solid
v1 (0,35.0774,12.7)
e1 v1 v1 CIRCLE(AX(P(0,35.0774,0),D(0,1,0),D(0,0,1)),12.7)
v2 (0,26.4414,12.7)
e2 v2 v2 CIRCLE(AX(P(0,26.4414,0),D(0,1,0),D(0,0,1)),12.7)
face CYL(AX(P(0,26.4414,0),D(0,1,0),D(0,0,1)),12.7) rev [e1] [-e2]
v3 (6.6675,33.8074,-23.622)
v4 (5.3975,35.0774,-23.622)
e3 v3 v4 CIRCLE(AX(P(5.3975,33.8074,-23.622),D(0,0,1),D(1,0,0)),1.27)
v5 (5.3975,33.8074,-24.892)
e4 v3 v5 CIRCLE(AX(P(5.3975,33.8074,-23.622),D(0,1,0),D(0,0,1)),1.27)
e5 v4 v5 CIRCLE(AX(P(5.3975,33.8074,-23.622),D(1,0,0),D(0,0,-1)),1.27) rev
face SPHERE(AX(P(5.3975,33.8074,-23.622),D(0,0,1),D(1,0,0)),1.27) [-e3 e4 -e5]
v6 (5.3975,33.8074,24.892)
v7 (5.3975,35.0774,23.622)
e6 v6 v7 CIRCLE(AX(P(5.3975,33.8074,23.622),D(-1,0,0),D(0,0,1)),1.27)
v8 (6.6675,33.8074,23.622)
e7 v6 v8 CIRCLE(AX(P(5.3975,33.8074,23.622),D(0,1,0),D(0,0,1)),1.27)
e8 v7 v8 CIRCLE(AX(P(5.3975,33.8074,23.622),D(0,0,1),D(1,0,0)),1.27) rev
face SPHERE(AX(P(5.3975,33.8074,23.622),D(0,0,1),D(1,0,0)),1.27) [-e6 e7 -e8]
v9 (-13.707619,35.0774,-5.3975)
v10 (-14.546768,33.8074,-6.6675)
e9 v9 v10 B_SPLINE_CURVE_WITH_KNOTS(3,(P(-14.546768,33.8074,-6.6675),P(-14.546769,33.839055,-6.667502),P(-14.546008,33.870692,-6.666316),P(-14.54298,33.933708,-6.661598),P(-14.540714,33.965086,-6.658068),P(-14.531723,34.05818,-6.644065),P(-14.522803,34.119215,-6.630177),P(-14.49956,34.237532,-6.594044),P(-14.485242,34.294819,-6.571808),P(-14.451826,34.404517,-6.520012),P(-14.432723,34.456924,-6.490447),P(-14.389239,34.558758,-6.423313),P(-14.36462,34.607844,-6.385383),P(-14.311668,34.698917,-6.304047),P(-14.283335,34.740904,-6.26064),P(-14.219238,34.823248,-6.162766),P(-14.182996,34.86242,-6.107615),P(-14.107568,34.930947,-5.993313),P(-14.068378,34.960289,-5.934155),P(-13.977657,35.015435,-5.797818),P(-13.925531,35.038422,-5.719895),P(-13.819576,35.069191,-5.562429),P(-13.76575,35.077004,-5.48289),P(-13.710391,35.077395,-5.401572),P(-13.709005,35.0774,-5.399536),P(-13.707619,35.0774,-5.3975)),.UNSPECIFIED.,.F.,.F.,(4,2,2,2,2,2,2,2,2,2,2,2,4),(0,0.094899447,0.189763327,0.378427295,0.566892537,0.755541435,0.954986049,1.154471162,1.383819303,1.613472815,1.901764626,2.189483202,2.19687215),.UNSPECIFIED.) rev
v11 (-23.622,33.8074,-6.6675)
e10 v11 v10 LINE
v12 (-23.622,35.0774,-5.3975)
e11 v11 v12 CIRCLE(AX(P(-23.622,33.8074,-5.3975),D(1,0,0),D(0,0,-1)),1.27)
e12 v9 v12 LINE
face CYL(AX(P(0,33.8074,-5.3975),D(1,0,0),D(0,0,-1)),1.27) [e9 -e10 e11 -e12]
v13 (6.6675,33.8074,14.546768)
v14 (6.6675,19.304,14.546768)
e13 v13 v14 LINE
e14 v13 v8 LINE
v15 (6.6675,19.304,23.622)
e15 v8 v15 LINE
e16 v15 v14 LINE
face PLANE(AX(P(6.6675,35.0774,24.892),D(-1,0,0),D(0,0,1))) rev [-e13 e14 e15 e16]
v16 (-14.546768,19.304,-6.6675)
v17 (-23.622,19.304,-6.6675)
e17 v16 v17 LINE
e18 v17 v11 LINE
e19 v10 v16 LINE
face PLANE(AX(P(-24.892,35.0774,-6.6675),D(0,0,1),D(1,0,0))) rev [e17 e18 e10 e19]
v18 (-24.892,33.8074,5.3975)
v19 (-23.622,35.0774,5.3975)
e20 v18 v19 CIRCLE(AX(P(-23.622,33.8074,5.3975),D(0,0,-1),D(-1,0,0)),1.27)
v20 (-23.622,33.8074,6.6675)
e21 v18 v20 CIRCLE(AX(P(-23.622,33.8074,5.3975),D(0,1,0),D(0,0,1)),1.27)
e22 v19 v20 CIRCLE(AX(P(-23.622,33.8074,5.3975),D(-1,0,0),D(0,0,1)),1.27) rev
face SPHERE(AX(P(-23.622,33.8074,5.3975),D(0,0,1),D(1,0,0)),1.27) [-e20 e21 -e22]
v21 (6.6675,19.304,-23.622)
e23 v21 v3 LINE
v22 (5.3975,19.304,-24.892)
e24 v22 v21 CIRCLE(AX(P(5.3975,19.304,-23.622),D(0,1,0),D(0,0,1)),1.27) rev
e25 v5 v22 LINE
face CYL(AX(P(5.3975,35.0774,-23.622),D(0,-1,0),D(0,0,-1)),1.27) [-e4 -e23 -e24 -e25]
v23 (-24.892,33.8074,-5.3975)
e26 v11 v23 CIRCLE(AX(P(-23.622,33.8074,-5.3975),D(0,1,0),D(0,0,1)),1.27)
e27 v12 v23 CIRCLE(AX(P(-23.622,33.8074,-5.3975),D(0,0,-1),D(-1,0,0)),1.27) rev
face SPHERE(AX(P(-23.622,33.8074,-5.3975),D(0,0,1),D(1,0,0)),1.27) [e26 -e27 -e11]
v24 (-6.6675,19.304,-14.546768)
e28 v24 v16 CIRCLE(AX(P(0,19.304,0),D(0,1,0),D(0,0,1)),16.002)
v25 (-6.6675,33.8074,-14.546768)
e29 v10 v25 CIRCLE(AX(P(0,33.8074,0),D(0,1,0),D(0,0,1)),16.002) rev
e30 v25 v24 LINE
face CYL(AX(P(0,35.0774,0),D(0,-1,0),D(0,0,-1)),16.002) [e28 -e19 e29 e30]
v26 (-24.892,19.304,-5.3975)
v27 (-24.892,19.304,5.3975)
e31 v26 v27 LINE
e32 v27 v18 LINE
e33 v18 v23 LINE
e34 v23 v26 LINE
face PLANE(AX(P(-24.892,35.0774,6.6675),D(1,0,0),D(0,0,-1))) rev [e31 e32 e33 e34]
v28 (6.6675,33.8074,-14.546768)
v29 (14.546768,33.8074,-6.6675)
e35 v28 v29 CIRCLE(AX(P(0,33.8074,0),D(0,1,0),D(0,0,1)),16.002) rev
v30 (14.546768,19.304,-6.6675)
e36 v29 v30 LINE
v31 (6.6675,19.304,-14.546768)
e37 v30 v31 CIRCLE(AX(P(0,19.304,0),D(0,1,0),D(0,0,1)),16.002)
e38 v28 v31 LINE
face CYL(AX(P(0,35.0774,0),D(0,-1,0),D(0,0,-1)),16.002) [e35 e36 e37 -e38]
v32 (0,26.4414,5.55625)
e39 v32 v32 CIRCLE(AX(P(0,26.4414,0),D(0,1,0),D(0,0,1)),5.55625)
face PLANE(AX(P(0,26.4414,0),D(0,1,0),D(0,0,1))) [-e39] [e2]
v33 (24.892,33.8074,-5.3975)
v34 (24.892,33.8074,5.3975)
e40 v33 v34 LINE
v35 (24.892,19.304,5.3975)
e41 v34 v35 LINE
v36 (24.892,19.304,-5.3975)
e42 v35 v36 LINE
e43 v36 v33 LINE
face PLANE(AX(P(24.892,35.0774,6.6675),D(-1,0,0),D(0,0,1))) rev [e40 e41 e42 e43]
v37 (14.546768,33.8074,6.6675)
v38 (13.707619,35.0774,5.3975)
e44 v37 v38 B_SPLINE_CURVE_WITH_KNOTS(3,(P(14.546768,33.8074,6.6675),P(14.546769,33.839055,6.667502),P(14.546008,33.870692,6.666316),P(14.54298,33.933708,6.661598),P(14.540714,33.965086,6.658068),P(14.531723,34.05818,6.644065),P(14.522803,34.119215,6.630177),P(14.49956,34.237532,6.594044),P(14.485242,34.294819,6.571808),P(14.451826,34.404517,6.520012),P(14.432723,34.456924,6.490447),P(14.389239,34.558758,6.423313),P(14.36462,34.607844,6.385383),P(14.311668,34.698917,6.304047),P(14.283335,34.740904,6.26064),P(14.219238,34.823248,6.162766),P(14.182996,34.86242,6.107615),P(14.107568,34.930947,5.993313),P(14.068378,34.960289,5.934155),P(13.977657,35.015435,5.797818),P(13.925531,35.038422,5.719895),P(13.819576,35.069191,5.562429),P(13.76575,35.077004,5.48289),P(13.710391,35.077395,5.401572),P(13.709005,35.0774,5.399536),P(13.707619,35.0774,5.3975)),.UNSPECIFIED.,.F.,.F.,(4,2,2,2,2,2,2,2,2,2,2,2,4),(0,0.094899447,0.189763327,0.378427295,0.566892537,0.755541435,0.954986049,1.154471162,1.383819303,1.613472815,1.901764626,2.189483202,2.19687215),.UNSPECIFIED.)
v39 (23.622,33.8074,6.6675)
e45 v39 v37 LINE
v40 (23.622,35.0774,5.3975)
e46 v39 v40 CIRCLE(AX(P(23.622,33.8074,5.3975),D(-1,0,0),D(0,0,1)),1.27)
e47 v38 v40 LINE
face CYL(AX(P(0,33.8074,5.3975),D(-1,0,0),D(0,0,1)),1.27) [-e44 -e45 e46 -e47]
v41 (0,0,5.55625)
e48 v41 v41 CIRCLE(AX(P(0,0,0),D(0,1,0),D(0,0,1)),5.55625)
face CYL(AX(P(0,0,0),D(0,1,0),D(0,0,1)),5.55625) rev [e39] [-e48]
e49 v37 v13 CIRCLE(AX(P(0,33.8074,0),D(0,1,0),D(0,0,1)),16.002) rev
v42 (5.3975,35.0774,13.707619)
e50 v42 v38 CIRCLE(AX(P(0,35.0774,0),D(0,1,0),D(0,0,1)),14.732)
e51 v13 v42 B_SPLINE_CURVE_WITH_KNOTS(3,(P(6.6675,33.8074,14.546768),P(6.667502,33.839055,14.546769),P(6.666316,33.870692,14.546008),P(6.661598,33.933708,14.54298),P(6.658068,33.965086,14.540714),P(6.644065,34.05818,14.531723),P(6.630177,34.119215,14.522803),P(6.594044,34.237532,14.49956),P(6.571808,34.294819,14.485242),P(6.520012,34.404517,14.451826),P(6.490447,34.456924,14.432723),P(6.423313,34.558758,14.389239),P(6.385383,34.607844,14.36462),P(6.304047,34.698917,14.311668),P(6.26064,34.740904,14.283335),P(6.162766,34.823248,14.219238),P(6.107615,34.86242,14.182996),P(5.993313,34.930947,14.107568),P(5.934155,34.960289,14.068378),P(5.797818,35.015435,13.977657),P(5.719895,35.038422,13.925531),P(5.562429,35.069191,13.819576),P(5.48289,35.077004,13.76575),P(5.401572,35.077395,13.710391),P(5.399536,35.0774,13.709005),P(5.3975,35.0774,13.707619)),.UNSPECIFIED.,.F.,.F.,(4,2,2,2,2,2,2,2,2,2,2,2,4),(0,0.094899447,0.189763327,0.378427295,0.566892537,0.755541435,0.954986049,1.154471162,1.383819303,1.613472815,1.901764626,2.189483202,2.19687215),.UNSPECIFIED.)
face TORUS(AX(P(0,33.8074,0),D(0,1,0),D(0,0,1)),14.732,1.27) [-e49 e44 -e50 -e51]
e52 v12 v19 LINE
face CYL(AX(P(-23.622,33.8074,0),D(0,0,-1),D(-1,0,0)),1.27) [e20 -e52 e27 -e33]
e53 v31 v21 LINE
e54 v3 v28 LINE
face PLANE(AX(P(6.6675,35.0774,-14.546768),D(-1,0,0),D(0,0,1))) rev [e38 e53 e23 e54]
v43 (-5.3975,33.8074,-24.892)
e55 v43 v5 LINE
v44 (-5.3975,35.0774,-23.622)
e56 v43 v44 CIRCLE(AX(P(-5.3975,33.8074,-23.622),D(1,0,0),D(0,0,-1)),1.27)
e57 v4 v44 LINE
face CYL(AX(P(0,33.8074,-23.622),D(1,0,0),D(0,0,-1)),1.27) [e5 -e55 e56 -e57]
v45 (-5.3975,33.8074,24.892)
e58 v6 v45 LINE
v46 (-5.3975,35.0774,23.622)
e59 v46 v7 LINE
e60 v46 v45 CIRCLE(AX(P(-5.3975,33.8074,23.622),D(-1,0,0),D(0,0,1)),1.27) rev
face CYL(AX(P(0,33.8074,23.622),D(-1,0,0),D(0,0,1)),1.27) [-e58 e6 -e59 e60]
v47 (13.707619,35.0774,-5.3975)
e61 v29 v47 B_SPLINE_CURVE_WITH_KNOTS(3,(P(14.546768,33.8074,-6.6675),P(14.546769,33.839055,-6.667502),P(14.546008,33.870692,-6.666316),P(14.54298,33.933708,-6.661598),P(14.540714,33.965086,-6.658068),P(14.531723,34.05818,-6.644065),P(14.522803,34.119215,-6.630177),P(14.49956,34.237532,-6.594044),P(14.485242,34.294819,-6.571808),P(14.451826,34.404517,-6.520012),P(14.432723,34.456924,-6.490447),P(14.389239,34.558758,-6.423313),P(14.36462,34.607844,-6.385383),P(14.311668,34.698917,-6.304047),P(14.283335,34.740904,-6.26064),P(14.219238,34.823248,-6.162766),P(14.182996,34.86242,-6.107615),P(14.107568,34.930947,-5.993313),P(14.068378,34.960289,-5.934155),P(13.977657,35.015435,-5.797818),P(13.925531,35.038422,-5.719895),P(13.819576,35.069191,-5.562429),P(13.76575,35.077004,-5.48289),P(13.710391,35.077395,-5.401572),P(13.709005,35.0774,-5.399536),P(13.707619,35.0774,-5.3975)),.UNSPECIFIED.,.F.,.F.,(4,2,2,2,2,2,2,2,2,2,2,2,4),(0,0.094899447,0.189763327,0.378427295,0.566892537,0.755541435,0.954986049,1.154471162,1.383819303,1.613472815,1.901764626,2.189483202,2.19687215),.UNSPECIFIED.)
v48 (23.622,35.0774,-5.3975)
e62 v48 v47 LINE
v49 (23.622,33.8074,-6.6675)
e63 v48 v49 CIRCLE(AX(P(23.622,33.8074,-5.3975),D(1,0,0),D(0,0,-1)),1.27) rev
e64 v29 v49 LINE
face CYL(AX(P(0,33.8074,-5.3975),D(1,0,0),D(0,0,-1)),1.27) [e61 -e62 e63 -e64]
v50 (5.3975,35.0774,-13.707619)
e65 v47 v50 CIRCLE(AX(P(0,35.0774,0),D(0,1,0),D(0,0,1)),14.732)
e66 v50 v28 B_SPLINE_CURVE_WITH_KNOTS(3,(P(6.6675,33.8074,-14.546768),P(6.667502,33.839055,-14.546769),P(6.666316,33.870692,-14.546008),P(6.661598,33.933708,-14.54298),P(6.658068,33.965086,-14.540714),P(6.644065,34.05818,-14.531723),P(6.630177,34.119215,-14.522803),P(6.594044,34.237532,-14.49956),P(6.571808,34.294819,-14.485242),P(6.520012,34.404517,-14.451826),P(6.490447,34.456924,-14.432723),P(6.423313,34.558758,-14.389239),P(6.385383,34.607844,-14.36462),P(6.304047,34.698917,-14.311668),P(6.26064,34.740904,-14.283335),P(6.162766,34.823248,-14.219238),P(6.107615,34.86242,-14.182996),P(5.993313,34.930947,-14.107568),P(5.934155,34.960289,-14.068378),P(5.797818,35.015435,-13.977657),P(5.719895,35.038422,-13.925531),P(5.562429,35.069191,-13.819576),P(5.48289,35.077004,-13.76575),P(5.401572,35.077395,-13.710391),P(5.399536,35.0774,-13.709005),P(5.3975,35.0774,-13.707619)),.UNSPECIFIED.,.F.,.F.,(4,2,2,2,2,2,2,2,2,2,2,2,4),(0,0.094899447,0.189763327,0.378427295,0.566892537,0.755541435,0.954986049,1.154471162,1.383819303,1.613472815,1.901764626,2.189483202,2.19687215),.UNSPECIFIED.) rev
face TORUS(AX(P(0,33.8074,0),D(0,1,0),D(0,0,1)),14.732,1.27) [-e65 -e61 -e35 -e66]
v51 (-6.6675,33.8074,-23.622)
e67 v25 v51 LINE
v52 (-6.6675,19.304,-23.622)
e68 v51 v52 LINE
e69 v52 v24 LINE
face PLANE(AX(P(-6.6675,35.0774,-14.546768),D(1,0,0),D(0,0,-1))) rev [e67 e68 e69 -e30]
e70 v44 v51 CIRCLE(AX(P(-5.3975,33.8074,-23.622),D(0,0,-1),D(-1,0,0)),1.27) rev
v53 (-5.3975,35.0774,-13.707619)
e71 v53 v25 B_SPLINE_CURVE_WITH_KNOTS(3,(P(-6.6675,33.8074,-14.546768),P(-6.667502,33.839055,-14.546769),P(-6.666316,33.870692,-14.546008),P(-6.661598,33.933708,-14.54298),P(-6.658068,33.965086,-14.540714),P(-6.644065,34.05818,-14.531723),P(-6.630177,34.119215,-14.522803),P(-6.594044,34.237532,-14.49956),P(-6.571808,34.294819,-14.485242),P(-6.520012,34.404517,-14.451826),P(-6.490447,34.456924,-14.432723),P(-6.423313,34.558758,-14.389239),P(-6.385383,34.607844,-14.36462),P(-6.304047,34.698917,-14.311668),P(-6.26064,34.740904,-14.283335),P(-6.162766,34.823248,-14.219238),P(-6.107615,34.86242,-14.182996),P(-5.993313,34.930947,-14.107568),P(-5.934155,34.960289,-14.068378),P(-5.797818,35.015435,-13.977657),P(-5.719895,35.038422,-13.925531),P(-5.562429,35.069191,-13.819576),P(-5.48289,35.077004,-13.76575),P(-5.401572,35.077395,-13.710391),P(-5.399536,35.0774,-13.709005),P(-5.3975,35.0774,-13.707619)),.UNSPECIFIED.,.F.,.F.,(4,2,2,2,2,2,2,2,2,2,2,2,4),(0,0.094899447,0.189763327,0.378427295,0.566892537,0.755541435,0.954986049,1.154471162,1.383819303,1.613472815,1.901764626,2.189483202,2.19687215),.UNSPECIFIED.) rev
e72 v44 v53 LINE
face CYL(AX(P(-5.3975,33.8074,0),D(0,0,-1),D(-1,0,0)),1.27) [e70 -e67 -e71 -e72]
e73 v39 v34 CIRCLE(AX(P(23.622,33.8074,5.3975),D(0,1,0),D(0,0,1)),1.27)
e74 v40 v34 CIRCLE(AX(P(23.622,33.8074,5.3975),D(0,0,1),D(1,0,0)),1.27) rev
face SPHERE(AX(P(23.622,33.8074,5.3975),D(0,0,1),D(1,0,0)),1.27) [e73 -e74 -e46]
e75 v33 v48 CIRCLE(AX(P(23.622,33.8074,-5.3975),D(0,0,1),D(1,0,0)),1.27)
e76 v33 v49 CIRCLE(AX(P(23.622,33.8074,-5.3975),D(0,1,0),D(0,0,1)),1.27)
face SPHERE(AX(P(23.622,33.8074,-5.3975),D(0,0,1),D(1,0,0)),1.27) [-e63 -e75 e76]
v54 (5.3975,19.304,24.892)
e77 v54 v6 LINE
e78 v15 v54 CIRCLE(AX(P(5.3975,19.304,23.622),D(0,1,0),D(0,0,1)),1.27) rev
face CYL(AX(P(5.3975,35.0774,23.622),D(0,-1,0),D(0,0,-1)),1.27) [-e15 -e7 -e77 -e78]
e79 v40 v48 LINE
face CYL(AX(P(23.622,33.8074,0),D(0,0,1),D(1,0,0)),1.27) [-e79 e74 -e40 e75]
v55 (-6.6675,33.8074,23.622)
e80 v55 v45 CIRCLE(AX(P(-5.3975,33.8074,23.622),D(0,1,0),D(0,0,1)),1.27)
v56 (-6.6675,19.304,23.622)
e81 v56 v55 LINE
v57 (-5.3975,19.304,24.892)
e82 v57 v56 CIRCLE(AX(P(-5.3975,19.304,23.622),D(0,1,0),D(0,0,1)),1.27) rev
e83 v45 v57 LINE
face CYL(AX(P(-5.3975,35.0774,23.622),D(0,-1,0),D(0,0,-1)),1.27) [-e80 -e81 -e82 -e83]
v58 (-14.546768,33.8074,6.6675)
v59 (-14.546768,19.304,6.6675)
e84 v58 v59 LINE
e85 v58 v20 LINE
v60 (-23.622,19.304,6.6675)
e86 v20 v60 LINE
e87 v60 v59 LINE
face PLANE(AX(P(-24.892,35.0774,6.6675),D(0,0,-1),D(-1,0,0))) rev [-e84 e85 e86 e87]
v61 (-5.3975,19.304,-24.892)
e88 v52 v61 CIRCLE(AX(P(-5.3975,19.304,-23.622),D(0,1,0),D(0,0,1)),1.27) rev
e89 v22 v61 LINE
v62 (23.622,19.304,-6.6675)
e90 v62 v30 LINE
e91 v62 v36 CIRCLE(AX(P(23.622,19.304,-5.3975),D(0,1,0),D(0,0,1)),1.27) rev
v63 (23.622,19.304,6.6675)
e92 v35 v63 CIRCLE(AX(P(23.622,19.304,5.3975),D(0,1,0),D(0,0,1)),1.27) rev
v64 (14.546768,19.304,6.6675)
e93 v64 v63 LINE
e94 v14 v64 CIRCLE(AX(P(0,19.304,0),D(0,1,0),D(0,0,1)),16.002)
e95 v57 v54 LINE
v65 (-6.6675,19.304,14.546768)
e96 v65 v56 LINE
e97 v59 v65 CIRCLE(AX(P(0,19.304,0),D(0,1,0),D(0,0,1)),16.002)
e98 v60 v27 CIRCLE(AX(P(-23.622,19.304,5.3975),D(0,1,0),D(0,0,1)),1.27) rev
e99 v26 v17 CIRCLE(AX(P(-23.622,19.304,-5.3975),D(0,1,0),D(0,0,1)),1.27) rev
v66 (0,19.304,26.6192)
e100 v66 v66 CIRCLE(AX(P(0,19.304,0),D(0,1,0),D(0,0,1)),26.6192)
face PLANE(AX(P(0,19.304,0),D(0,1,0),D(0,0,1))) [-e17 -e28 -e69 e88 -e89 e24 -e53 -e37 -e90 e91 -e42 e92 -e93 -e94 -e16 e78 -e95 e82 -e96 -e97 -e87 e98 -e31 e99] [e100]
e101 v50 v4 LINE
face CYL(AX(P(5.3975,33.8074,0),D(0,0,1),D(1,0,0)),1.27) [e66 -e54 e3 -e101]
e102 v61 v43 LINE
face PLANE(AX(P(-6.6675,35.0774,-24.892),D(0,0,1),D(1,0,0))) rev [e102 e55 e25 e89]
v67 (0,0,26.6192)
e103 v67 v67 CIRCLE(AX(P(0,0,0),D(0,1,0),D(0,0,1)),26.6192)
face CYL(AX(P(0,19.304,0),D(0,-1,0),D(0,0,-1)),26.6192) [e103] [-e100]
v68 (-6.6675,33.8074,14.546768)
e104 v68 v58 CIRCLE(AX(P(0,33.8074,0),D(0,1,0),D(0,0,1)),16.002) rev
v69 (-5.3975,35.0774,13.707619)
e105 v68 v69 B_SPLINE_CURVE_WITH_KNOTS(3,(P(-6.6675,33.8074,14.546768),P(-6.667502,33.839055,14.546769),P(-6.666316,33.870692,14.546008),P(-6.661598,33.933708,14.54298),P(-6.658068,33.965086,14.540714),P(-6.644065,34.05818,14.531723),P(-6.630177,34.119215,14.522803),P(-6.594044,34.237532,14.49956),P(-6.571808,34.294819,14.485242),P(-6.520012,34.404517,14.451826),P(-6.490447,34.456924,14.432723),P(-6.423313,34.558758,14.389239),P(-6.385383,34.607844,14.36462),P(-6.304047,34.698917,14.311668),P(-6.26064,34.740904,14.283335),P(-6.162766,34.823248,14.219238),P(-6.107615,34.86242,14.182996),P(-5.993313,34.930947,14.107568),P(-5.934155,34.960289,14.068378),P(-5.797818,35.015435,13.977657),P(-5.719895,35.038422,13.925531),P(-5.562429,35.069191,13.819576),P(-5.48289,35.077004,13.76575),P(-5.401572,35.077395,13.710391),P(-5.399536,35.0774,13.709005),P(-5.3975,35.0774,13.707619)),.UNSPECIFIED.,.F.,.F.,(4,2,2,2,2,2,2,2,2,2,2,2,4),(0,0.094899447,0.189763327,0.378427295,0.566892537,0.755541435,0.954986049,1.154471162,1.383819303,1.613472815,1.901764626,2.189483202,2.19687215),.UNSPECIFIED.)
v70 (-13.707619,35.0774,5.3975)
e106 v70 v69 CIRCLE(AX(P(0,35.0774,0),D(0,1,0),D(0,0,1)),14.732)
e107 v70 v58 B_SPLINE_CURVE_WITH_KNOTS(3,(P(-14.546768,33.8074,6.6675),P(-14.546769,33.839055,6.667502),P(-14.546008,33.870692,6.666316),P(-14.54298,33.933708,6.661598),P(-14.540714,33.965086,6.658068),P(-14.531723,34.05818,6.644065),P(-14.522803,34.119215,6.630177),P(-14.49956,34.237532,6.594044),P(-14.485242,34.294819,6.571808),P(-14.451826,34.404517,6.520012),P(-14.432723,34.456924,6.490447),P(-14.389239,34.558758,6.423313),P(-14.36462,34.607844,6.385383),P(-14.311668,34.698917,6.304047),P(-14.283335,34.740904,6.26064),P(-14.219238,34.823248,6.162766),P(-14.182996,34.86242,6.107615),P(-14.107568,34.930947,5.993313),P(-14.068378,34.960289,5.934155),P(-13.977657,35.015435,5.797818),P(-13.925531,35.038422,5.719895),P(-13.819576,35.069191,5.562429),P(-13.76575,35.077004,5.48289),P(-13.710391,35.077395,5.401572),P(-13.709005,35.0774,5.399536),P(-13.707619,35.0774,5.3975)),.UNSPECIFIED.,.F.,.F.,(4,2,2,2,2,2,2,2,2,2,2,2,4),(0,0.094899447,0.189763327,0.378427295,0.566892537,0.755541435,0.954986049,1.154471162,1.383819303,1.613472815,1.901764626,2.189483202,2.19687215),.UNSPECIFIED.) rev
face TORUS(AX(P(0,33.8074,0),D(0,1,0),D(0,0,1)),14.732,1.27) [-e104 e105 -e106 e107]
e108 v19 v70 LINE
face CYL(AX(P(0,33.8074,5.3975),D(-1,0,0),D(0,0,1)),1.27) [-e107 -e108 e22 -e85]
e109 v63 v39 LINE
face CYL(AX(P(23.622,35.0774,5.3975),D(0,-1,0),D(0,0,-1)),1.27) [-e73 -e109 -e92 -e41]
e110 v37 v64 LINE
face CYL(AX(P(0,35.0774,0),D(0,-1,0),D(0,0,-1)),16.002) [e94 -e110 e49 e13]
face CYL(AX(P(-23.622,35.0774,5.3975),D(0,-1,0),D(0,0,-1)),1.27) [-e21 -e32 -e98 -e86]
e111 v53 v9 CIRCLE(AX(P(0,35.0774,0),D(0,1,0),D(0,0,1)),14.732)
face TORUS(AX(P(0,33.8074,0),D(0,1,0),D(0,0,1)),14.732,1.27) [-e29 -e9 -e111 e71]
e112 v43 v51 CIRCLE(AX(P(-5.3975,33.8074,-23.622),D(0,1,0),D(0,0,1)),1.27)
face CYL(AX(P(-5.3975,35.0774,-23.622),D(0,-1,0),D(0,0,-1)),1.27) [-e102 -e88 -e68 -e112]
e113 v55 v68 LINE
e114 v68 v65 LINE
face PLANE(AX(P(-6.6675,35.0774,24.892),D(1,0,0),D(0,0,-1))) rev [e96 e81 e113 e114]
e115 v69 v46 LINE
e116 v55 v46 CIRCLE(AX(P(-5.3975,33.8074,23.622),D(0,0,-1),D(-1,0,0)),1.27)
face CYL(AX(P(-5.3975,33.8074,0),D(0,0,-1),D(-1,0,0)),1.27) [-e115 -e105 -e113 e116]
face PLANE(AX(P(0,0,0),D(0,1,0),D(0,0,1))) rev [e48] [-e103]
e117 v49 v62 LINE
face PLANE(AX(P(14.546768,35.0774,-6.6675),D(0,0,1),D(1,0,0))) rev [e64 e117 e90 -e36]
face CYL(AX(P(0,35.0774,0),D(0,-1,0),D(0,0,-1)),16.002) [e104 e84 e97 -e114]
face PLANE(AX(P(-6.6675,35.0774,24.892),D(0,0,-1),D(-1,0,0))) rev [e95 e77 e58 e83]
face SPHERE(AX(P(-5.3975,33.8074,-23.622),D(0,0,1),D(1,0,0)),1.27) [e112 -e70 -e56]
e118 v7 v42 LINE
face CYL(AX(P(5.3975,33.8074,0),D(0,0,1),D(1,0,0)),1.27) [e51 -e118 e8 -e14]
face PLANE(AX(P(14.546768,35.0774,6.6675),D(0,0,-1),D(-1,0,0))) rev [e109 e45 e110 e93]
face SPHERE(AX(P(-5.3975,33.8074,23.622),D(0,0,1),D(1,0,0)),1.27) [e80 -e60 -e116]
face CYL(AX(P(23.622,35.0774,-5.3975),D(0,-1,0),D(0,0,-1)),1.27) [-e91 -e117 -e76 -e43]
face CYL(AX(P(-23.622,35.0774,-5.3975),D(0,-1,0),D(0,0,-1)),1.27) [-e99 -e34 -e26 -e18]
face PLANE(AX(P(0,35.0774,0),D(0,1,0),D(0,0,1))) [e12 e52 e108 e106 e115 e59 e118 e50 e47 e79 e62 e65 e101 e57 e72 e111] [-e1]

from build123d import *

# Parameters (mm, degrees)
SKETCH1_R           = 26.6192
BOSS_EXTRUDE1_DEPTH = 19.304
BOSS_EXTRUDE2_DEPTH = 15.7734
SKETCH3_R           = 12.7
CUT_EXTRUDE1_DEPTH  = 8.636
SKETCH4_R           = 5.55625
CUT_EXTRUDE2_DEPTH  = 47.003383041
FILLET1_R           = 1.27
FILLET2_R           = 1.27


with BuildPart() as part:
    # Sketch1 → Boss-Extrude1 (new body)
    with BuildSketch(Plane(origin=(0, 0, 0), x_dir=(1, 0, 0), z_dir=(0, 1, 0))):
        with Locations(Location((0, 0, 0), (0, 0, 270))):
            Circle(SKETCH1_R)
    extrude(amount=BOSS_EXTRUDE1_DEPTH)

    # Sketch2 → Boss-Extrude2 (add)
    with BuildSketch(Plane(origin=(0, 19.304, 0), x_dir=(1, 0, 0), z_dir=(0, 1, 0))):
        with BuildLine():
            Line((-6.6675, 14.546767605), (-6.6675, 24.892))
            Line((-6.6675, 24.892), (6.6675, 24.892))
            Line((6.6675, 24.892), (6.6675, 14.546767605))
            ThreePointArc((6.6675, 14.546767605), (11.315122713, 11.315122713), (14.546767605, 6.6675))
            Line((14.546767605, 6.6675), (24.892, 6.6675))
            Line((24.892, 6.6675), (24.892, -6.6675))
            Line((24.892, -6.6675), (14.546767605, -6.6675))
            ThreePointArc((14.546767605, -6.6675), (11.315122713, -11.315122713), (6.6675, -14.546767605))
            Line((6.6675, -14.546767605), (6.6675, -24.892))
            Line((6.6675, -24.892), (-6.6675, -24.892))
            Line((-6.6675, -24.892), (-6.6675, -14.546767605))
            ThreePointArc((-6.6675, -14.546767605), (-11.315122713, -11.315122713), (-14.546767605, -6.6675))
            Line((-14.546767605, -6.6675), (-24.892, -6.6675))
            Line((-24.892, -6.6675), (-24.892, 6.6675))
            Line((-24.892, 6.6675), (-14.546767605, 6.6675))
            ThreePointArc((-14.546767605, 6.6675), (-11.315122713, 11.315122713), (-6.6675, 14.546767605))
        make_face()
    extrude(amount=BOSS_EXTRUDE2_DEPTH)

    # Sketch3 → Cut-Extrude1 (cut)
    with BuildSketch(Plane(origin=(0, 35.0774, 0), x_dir=(1, 0, 0), z_dir=(0, 1, 0))):
        with Locations(Location((0, 0, 0), (0, 0, 270))):
            Circle(SKETCH3_R)
    extrude(amount=-CUT_EXTRUDE1_DEPTH, mode=Mode.SUBTRACT)

    # Sketch4 → Cut-Extrude2 (cut, through all)
    with BuildSketch(Plane(origin=(0, 26.4414, 0), x_dir=(1, 0, 0), z_dir=(0, 1, 0))):
        with Locations(Location((0, 0, 0), (0, 0, 270))):
            Circle(SKETCH4_R)
    extrude(amount=-CUT_EXTRUDE2_DEPTH, mode=Mode.SUBTRACT)

    # Fillet1
    fillet1_edges = [part.edges().sort_by_distance(p)[0] for p in [
        (-11.315122713, 35.0774, -11.315122713),
        (-19.719383802, 35.0774, -6.6675),
        (-24.892, 35.0774, 0),
        (-19.719383802, 35.0774, 6.6675),
        (-11.315122713, 35.0774, 11.315122713),
        (-6.6675, 35.0774, 19.719383802),
        (0, 35.0774, 24.892),
        (6.6675, 35.0774, 19.719383802),
        (11.315122713, 35.0774, 11.315122713),
        (19.719383802, 35.0774, 6.6675),
        (24.892, 35.0774, 0),
        (19.719383802, 35.0774, -6.6675),
        (11.315122713, 35.0774, -11.315122713),
        (6.6675, 35.0774, -19.719383802),
        (0, 35.0774, -24.892),
        (-6.6675, 35.0774, -19.719383802),
    ]]
    fillet(fillet1_edges, radius=FILLET1_R)

    # Fillet2
    # the kernel refuses this fillet: 1.27 mm, written as the material it takes off along each edge
    with BuildSketch(Plane(origin=(5.3975, 33.8074, -23.622), x_dir=(0, 0, -1), z_dir=(1, 0, 0))) as fillet2_piece_1_section:
        Polygon((0, 0), (FILLET2_R, 0), (FILLET2_R, FILLET2_R), (0, FILLET2_R), align=None)
    fillet2_piece_1 = extrude(amount=FILLET2_R, mode=Mode.PRIVATE)
    fillet2_piece_1 = fillet2_piece_1 - Plane(origin=(5.3975, 33.8074, -23.622), x_dir=(0, -0.7071067811865475, 0.7071067811865475), z_dir=(1, 0, 0)) * Sphere(FILLET2_R, mode=Mode.PRIVATE)
    add(fillet2_piece_1, mode=Mode.SUBTRACT)
    with BuildSketch(Plane(origin=(23.622, 33.8074, -5.3975), x_dir=(0, 0, -1), z_dir=(1, 0, 0))) as fillet2_piece_2_section:
        Polygon((0, 0), (FILLET2_R, 0), (FILLET2_R, FILLET2_R), (0, FILLET2_R), align=None)
    fillet2_piece_2 = extrude(amount=FILLET2_R, mode=Mode.PRIVATE)
    fillet2_piece_2 = fillet2_piece_2 - Plane(origin=(23.622, 33.8074, -5.3975), x_dir=(0, -0.7071067811865475, 0.7071067811865475), z_dir=(1, 0, 0)) * Sphere(FILLET2_R, mode=Mode.PRIVATE)
    add(fillet2_piece_2, mode=Mode.SUBTRACT)
    with BuildSketch(Plane(origin=(-5.3975, 33.8074, -23.622), x_dir=(0, 0, -1), z_dir=(-1, 0, 0))) as fillet2_piece_3_section:
        Polygon((0, 0), (FILLET2_R, 0), (FILLET2_R, -FILLET2_R), (0, -FILLET2_R), align=None)
    fillet2_piece_3 = extrude(amount=FILLET2_R, mode=Mode.PRIVATE)
    fillet2_piece_3 = fillet2_piece_3 - Plane(origin=(-5.3975, 33.8074, -23.622), x_dir=(0, -0.7071067811865475, 0.7071067811865475), z_dir=(-1, 0, 0)) * Sphere(FILLET2_R, mode=Mode.PRIVATE)
    add(fillet2_piece_3, mode=Mode.SUBTRACT)
    with BuildSketch(Plane(origin=(23.622, 33.8074, 5.3975), x_dir=(1, 0, 0), z_dir=(0, 0, 1))) as fillet2_piece_4_section:
        Polygon((0, 0), (FILLET2_R, 0), (FILLET2_R, FILLET2_R), (0, FILLET2_R), align=None)
    fillet2_piece_4 = extrude(amount=FILLET2_R, mode=Mode.PRIVATE)
    fillet2_piece_4 = fillet2_piece_4 - Plane(origin=(23.622, 33.8074, 5.3975), x_dir=(-0.7071067811865475, -0.7071067811865475, 0), z_dir=(0, 0, 1)) * Sphere(FILLET2_R, mode=Mode.PRIVATE)
    add(fillet2_piece_4, mode=Mode.SUBTRACT)
    with BuildSketch(Plane(origin=(-23.622, 33.8074, -5.3975), x_dir=(-1, 0, 0), z_dir=(0, 0, -1))) as fillet2_piece_5_section:
        Polygon((0, 0), (FILLET2_R, 0), (FILLET2_R, FILLET2_R), (0, FILLET2_R), align=None)
    fillet2_piece_5 = extrude(amount=FILLET2_R, mode=Mode.PRIVATE)
    fillet2_piece_5 = fillet2_piece_5 - Plane(origin=(-23.622, 33.8074, -5.3975), x_dir=(0.7071067811865475, -0.7071067811865475, 0), z_dir=(0, 0, -1)) * Sphere(FILLET2_R, mode=Mode.PRIVATE)
    add(fillet2_piece_5, mode=Mode.SUBTRACT)
    with BuildSketch(Plane(origin=(5.3975, 33.8074, 23.622), x_dir=(1, 0, 0), z_dir=(0, 0, 1))) as fillet2_piece_6_section:
        Polygon((0, 0), (FILLET2_R, 0), (FILLET2_R, FILLET2_R), (0, FILLET2_R), align=None)
    fillet2_piece_6 = extrude(amount=FILLET2_R, mode=Mode.PRIVATE)
    fillet2_piece_6 = fillet2_piece_6 - Plane(origin=(5.3975, 33.8074, 23.622), x_dir=(-0.7071067811865475, -0.7071067811865475, 0), z_dir=(0, 0, 1)) * Sphere(FILLET2_R, mode=Mode.PRIVATE)
    add(fillet2_piece_6, mode=Mode.SUBTRACT)
    with BuildSketch(Plane(origin=(-23.622, 33.8074, 5.3975), x_dir=(0, 0, 1), z_dir=(-1, 0, 0))) as fillet2_piece_7_section:
        Polygon((0, 0), (FILLET2_R, 0), (FILLET2_R, FILLET2_R), (0, FILLET2_R), align=None)
    fillet2_piece_7 = extrude(amount=FILLET2_R, mode=Mode.PRIVATE)
    fillet2_piece_7 = fillet2_piece_7 - Plane(origin=(-23.622, 33.8074, 5.3975), x_dir=(0, -0.7071067811865475, -0.7071067811865475), z_dir=(-1, 0, 0)) * Sphere(FILLET2_R, mode=Mode.PRIVATE)
    add(fillet2_piece_7, mode=Mode.SUBTRACT)
    with BuildSketch(Plane(origin=(-5.3975, 33.8074, 23.622), x_dir=(0, 0, 1), z_dir=(-1, 0, 0))) as fillet2_piece_8_section:
        Polygon((0, 0), (FILLET2_R, 0), (FILLET2_R, FILLET2_R), (0, FILLET2_R), align=None)
    fillet2_piece_8 = extrude(amount=FILLET2_R, mode=Mode.PRIVATE)
    fillet2_piece_8 = fillet2_piece_8 - Plane(origin=(-5.3975, 33.8074, 23.622), x_dir=(0, -0.7071067811865475, -0.7071067811865475), z_dir=(-1, 0, 0)) * Sphere(FILLET2_R, mode=Mode.PRIVATE)
    add(fillet2_piece_8, mode=Mode.SUBTRACT)
    with BuildSketch(Plane(origin=(-6.6675, 19.304, 24.892), x_dir=(0, 0, -1), z_dir=(0, 1, 0)), Plane(origin=(6.6675, 19.304, 24.892), x_dir=(-1, 0, 0), z_dir=(0, 1, 0)), Plane(origin=(24.892, 19.304, 6.6675), x_dir=(-1, 0, 0), z_dir=(0, 1, 0)), Plane(origin=(24.892, 19.304, -6.6675), x_dir=(0, 0, 1), z_dir=(0, 1, 0)), Plane(origin=(6.6675, 19.304, -24.892), x_dir=(0, 0, 1), z_dir=(0, 1, 0)), Plane(origin=(-24.892, 19.304, -6.6675), x_dir=(1, 0, 0), z_dir=(0, 1, 0)), Plane(origin=(-24.892, 19.304, 6.6675), x_dir=(0, 0, -1), z_dir=(0, 1, 0))) as fillet2_piece_9:
        with BuildLine():
            CenterArc((FILLET2_R, -FILLET2_R), FILLET2_R, 90, 90)
            Line((0, -FILLET2_R), (0, 0))
            Line((0, 0), (FILLET2_R, 0))
        make_face()
    extrude(amount=14.5034, mode=Mode.SUBTRACT)
    with BuildSketch(Plane(origin=(-6.6675, 19.304, -24.892), x_dir=(0, 0, 1), z_dir=(0, 1, 0))) as fillet2_piece_10:
        with BuildLine():
            CenterArc((FILLET2_R, FILLET2_R), FILLET2_R, 180, 90)
            Line((0, FILLET2_R), (0, 0))
            Line((0, 0), (FILLET2_R, 0))
        make_face()
    extrude(amount=14.5034, mode=Mode.SUBTRACT)


solid = part.part
